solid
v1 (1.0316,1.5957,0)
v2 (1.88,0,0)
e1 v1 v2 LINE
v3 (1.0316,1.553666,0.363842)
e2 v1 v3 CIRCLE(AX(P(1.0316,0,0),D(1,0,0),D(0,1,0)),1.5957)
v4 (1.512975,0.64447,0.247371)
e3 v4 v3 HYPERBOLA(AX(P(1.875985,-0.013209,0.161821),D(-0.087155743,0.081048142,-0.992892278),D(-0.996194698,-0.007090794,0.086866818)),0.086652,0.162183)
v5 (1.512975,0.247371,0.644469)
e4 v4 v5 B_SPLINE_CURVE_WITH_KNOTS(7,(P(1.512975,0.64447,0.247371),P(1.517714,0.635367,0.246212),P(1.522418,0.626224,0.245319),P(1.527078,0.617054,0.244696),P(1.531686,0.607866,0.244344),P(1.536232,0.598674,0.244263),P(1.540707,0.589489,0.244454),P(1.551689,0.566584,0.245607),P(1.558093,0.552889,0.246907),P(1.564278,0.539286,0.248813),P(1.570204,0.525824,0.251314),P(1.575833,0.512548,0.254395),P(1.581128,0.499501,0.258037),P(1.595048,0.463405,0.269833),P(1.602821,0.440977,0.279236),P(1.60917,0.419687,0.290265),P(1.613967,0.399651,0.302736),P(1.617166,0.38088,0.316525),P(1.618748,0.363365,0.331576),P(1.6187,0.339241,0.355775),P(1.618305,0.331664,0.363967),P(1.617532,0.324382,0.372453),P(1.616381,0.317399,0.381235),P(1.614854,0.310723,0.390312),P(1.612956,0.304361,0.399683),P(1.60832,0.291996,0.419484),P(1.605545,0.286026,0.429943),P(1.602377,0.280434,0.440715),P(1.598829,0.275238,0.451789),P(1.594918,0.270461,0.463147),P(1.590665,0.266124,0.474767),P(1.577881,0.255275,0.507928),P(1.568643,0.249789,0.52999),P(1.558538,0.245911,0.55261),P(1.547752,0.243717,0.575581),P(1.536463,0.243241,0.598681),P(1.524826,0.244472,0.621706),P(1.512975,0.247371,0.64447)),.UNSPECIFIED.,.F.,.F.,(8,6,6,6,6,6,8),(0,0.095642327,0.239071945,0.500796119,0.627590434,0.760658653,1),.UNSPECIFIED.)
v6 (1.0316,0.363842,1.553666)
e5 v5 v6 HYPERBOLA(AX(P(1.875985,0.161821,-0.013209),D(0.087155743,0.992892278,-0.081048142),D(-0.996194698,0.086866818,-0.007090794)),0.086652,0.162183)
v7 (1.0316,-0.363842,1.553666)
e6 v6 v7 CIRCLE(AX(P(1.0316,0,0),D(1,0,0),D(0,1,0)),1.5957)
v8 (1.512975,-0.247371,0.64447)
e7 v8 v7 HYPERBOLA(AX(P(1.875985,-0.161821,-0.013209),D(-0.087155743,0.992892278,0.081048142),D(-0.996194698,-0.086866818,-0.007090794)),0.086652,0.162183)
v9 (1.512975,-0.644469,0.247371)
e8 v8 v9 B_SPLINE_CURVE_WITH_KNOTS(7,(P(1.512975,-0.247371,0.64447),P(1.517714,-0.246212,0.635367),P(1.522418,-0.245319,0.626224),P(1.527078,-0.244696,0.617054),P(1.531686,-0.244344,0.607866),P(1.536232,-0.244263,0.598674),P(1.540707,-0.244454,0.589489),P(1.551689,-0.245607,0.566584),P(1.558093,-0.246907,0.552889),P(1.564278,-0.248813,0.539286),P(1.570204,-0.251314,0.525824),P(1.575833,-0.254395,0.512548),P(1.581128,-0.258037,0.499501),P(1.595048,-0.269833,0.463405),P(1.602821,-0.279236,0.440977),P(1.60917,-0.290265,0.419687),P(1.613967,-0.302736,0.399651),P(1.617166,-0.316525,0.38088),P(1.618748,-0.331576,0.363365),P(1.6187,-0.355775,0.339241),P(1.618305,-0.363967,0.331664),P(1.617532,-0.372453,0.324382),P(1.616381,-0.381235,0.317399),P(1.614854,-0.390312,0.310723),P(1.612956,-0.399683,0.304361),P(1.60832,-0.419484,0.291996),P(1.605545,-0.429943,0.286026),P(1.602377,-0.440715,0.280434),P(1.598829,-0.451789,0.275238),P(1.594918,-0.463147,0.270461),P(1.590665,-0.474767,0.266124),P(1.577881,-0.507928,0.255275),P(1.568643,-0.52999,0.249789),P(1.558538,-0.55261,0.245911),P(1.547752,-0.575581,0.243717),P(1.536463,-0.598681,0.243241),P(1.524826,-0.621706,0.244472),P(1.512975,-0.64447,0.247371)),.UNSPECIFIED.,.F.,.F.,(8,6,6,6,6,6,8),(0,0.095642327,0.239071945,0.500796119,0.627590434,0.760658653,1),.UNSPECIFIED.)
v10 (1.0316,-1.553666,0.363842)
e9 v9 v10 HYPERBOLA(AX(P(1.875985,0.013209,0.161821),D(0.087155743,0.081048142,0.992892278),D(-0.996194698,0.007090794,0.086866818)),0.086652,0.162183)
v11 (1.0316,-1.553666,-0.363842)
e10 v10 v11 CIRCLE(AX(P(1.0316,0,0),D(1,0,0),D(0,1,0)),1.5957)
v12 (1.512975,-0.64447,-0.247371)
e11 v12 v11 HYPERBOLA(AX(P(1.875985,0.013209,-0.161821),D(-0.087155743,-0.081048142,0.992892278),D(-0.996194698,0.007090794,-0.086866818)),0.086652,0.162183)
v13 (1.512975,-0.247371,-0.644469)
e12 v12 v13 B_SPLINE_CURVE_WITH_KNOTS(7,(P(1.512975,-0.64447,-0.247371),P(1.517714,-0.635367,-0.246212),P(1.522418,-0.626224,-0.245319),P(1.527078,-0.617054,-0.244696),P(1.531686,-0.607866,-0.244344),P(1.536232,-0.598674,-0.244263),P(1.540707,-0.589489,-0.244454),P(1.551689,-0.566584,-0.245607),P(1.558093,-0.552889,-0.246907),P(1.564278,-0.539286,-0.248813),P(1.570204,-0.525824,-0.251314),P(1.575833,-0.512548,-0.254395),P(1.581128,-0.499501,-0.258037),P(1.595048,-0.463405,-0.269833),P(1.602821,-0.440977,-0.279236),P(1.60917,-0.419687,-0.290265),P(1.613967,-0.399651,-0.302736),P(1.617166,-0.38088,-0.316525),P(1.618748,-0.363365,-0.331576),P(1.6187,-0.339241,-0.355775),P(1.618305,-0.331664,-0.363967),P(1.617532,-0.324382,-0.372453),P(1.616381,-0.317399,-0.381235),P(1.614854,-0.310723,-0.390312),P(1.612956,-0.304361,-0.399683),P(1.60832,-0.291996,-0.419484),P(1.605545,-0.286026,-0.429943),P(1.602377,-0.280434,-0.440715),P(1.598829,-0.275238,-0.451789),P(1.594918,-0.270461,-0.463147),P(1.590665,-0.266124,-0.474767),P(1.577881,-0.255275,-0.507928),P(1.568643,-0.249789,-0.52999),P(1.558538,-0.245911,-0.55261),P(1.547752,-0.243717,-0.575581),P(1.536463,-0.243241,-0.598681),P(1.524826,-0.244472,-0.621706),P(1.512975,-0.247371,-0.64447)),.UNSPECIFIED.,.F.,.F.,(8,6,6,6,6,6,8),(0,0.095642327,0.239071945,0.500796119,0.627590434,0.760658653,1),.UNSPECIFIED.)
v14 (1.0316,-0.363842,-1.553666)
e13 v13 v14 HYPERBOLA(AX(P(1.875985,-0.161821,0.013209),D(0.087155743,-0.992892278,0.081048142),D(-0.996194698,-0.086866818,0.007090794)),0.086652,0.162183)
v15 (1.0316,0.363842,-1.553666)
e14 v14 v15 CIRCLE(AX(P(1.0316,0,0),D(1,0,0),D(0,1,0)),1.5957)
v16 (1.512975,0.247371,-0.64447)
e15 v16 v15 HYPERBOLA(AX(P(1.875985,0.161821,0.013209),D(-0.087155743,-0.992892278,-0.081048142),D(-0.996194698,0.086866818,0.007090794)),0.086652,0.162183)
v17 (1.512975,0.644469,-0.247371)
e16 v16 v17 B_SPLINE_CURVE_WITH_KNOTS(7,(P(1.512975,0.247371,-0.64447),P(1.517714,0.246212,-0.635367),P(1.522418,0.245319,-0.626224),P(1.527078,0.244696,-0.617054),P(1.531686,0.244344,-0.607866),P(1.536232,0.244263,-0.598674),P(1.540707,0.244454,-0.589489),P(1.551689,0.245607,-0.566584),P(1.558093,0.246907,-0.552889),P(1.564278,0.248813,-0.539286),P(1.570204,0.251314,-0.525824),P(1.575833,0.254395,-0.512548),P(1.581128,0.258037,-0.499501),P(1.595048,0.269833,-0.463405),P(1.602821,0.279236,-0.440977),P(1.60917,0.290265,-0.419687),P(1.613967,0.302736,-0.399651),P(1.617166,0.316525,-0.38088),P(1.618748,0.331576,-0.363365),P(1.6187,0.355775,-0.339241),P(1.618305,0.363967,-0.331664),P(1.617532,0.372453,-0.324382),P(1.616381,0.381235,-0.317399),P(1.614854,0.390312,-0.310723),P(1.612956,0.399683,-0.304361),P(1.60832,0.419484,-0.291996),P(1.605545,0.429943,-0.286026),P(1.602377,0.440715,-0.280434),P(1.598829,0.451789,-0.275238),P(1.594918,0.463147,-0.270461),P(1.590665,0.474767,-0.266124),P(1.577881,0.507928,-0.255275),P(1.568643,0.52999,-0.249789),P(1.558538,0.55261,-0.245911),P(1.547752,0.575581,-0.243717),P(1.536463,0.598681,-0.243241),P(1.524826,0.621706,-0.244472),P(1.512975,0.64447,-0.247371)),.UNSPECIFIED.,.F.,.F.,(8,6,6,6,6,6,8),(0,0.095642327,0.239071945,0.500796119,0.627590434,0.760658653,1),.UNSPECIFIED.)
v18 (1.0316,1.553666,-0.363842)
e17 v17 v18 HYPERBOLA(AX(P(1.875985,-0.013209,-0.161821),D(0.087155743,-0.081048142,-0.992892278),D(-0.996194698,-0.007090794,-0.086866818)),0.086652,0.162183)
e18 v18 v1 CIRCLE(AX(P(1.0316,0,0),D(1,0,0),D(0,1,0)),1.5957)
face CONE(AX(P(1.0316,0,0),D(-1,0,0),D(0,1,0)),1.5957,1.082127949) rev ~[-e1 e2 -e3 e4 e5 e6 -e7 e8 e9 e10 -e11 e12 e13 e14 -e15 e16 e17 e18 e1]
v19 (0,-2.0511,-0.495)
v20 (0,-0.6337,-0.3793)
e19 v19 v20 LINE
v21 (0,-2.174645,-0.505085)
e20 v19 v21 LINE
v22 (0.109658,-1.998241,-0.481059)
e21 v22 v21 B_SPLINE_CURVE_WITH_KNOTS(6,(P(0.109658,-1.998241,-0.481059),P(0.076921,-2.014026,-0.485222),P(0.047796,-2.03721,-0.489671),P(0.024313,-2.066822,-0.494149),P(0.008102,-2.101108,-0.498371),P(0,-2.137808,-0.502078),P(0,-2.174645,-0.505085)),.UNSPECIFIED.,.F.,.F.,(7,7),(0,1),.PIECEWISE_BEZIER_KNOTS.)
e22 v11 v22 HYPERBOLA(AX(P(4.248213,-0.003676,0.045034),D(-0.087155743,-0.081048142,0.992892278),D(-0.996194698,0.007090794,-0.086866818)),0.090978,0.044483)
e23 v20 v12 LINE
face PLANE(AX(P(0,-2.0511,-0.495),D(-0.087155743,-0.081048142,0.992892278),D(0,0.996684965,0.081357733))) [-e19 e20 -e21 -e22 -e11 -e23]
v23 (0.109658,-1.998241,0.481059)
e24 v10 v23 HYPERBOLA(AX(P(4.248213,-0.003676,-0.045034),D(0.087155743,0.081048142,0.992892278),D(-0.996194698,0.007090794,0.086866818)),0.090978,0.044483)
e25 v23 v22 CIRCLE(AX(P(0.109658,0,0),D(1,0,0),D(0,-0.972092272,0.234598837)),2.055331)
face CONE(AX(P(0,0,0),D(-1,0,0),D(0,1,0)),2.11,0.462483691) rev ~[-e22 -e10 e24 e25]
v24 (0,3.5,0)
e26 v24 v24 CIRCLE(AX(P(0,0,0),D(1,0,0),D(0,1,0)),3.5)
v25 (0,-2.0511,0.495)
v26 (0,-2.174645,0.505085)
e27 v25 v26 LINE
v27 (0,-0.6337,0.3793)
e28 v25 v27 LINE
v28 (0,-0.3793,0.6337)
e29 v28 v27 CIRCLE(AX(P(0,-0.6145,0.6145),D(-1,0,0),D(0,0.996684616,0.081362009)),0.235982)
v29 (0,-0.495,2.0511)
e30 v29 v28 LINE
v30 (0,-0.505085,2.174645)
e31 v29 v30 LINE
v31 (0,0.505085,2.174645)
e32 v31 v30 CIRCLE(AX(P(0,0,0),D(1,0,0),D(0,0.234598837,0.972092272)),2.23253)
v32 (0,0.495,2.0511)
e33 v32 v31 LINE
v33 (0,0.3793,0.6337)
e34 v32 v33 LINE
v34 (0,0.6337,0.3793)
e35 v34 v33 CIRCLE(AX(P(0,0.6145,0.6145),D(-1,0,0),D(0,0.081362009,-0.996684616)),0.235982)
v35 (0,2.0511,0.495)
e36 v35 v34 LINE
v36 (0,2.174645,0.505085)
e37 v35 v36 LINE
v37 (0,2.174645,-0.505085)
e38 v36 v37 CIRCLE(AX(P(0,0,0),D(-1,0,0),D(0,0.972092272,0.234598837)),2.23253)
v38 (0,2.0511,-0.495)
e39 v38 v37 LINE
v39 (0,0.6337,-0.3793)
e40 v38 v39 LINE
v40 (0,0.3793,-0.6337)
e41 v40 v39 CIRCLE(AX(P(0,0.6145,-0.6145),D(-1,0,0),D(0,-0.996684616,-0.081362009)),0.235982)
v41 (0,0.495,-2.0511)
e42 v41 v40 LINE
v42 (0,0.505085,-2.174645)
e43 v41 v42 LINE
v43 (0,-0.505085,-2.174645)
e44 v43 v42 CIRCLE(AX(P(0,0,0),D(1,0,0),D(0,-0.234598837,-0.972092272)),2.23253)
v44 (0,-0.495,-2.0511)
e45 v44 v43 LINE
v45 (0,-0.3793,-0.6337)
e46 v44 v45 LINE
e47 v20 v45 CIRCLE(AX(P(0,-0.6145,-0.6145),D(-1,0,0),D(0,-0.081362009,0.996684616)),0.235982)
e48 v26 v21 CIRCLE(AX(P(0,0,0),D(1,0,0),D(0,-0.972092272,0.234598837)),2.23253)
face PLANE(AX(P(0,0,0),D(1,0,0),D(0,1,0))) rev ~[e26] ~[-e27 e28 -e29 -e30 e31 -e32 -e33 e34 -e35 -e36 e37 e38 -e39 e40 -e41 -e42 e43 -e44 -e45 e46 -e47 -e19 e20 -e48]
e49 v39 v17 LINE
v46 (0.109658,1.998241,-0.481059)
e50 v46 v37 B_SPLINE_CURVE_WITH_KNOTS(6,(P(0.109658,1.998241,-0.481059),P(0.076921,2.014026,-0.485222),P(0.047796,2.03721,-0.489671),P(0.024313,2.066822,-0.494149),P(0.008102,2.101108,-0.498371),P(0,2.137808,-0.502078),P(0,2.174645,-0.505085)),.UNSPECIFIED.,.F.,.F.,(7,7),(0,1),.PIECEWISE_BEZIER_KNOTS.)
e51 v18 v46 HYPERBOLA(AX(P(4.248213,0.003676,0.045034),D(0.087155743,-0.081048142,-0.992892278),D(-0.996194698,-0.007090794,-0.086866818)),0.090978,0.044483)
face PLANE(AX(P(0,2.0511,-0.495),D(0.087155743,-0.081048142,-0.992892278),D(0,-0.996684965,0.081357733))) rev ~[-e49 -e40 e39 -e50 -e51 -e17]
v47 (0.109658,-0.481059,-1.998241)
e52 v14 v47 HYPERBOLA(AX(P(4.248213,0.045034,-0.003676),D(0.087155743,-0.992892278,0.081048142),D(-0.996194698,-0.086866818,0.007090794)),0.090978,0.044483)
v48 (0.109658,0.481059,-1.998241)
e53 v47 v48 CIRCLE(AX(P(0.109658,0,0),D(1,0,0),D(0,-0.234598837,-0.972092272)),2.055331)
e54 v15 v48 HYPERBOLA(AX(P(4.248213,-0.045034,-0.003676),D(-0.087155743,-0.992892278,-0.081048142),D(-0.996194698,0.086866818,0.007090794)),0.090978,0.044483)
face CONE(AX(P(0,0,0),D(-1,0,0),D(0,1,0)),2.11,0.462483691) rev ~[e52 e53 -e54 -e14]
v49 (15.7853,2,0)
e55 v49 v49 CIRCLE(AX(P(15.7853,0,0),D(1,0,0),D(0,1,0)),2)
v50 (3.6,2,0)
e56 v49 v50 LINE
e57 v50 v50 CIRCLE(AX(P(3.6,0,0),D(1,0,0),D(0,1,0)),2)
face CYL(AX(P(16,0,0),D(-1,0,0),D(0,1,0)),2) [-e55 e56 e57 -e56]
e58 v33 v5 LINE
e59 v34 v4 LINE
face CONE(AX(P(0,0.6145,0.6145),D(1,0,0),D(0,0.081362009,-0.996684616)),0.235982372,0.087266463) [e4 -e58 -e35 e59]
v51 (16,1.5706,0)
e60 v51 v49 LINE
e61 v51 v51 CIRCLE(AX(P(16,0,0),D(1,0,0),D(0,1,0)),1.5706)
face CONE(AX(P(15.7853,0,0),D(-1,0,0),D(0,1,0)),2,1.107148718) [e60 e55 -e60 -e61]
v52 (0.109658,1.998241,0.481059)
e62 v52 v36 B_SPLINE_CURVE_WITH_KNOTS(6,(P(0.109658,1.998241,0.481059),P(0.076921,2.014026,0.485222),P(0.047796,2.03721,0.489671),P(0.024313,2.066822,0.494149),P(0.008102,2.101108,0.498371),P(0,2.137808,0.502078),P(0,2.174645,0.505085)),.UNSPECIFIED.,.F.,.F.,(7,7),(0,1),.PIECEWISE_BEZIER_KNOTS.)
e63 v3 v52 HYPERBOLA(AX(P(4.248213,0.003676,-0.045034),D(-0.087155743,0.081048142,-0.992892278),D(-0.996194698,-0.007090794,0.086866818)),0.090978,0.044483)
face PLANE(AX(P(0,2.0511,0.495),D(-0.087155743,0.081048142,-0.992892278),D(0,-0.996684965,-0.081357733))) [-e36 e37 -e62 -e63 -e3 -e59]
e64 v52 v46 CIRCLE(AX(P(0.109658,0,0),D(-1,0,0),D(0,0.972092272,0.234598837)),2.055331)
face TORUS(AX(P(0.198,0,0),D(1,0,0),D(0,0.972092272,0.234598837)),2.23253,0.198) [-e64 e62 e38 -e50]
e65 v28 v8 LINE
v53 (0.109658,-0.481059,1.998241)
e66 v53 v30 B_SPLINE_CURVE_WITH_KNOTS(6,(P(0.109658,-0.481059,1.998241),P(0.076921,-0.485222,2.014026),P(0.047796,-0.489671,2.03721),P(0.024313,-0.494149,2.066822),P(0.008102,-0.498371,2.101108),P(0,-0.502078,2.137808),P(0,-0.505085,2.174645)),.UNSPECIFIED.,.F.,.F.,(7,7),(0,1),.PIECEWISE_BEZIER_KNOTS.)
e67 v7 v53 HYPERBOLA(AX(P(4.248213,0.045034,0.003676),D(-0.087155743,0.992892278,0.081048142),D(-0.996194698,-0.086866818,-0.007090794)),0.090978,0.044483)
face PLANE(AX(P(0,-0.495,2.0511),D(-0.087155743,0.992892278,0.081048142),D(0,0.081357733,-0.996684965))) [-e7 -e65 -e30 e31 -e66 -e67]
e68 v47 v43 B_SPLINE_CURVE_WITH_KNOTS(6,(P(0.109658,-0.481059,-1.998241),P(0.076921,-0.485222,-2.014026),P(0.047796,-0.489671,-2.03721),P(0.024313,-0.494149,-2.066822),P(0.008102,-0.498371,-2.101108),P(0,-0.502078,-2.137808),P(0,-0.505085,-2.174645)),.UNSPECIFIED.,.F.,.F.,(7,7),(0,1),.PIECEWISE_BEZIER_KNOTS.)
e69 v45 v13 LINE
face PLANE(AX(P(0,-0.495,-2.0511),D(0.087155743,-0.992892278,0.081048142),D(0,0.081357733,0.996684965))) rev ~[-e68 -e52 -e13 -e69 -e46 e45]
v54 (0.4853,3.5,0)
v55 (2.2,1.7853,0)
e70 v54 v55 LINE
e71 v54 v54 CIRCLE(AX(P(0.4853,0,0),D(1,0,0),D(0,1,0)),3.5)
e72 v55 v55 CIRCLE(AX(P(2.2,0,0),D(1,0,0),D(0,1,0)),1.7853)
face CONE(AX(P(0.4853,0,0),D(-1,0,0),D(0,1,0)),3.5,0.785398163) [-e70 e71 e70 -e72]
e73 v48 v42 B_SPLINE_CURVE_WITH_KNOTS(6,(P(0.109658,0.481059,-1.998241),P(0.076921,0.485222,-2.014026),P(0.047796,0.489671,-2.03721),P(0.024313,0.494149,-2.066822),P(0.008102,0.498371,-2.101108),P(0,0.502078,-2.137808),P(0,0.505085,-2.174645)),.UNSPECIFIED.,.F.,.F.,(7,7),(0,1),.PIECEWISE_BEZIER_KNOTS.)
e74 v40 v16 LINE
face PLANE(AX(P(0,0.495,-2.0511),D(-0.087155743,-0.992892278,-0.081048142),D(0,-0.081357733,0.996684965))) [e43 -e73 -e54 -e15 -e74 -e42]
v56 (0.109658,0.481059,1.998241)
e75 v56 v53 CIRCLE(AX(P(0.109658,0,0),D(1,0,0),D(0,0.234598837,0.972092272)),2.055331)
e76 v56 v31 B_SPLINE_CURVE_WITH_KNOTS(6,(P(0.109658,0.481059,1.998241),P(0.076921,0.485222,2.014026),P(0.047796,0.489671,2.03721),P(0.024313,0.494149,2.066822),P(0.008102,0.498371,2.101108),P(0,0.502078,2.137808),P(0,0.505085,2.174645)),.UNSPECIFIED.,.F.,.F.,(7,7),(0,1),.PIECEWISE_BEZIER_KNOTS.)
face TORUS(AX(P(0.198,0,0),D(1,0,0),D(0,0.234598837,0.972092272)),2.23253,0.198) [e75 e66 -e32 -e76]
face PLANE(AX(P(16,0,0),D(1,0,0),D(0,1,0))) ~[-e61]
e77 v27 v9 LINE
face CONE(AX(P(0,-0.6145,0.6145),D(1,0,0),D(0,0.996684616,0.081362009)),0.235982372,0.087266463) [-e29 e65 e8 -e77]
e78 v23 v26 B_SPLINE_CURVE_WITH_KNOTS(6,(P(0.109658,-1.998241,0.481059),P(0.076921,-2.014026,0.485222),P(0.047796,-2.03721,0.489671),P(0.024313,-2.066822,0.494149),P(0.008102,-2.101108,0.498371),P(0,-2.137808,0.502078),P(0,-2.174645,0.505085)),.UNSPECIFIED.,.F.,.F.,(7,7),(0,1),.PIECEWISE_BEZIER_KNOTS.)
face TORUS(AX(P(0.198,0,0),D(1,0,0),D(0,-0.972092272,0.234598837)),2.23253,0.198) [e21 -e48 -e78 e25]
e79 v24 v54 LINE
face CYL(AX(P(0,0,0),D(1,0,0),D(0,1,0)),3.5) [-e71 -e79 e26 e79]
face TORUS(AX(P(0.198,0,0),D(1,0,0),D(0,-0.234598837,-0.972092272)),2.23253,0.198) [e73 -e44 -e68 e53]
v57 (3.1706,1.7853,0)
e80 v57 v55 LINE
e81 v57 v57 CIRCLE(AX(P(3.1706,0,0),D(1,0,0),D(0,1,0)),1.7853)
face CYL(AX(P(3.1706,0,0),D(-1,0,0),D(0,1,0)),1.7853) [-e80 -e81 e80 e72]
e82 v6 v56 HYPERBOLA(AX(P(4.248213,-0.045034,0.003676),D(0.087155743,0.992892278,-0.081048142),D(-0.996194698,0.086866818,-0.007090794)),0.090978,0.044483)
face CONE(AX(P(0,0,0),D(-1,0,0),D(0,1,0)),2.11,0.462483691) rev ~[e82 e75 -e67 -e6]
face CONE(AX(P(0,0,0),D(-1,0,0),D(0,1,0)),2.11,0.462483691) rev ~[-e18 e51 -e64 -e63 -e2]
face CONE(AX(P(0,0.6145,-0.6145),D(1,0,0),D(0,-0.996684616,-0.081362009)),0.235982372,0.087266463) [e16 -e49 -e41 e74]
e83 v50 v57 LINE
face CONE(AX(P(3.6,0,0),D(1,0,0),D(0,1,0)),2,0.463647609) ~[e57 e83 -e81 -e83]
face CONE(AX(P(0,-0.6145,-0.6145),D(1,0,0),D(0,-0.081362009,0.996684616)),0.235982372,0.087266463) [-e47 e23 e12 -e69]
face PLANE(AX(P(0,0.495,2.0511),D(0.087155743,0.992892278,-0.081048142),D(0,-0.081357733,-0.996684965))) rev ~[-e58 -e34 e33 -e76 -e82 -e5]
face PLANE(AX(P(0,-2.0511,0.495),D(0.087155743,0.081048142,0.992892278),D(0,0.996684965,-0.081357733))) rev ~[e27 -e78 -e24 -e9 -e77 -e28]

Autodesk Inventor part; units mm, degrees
ref_plane "YZ Plane" through (0, 0, 0) normal (1, 0, 0) x (0, 1, 0)
ref_plane "XZ Plane" through (0, 0, 0) normal (0, 1, 0) x (-1, 0, 0)
sketch "Sketch1" plane through (0, 0, 0) normal (0, 0, 1) x (1, 0, 0)
  line L0 (1.88, 0) -> (16, 0)
  line L1 (16, 0) -> (16, 2)
  line L2 (16, 2) -> (3.6, 2)
  line L3 (3.6, 2) -> (3.1706, 1.7853)
  line L4 (3.1706, 1.7853) -> (2.2, 1.7853)
  line L5 (0, 3.5) -> (0, 2.11)
  line L6 (0, 2.11) -> (1.0316, 1.5957)
  line L7 (1.0316, 1.5957) -> (1.88, 0)
  line L8 (-3.2, 0) -> (19.2, 0) projected
  line L9 (0, -0.7) -> (0, 4.2) projected
  line L10 (0, 3.5) -> (0.4853, 3.5)
  line L11 (0.4853, 3.5) -> (2.2, 1.7853)
  line L12 (3.6, 2) -> (1.9853, 2) construction
  dimension "d1" = 12.4
  dimension "d2" = 4
  dimension "d3" = 3.5706
  dimension "d4" = 4.22
  dimension "d5" = 26.5
  dimension "d6" = 62
  dimension "d7" = 1.88
  dimension "d8" = 0.4294
  dimension "d12" = 7
  dimension "d13" = 45
  dimension "d15" = 16
  dimension "d24" = 2.2
revolve "Body" add sketch "Sketch1" angle 360 about axis through (1.88, 0, 0) along (1, 0, 0) contours L7 L6 L5 L10 L11 L4 L3 L2 L1 L0
sketch "Sketch2" plane through (0, 0, 0) normal (-1, 0, 0) x (0, 0, 1)
  line L0 (0, 2.11) -> (0, 0) construction
  line L1 (0, 0) -> (2.11, 0) construction
  arc A0 (0.633, 0) -> (0, 0.633) centre (0, 0) ccw construction
  arc A1 (0.7385, 0) -> (0, 0.7385) centre (0, 0) ccw construction
  arc A2 (2.0511, 0.495) -> (0.495, 2.0511) centre (0, 0) ccw
  line L2 (0, 0) -> (1.492, 1.492) construction
  line L3 (0.495, 2.0511) -> (0.3793, 0.6337)
  line L4 (2.0511, 0.495) -> (0.6337, 0.3793)
  arc A3 (0.495, 2.0511) -> (0, 2.11) centre (0, 0) ccw
  arc A4 (2.11, 0) -> (2.0511, 0.495) centre (0, 0) ccw
  line L5 (0, -4.9) -> (0, 4.9) projected
  line L6 (-4.9, 0) -> (4.9, 0) projected
  arc A5 (0.495, -2.0511) -> (2.0511, -0.495) centre (0, 0) ccw
  line L7 (0.495, -2.0511) -> (0.3793, -0.6337)
  line L8 (2.0511, -0.495) -> (0.6337, -0.3793)
  arc A6 (0, -2.11) -> (0.495, -2.0511) centre (0, 0) ccw
  arc A7 (2.0511, -0.495) -> (2.11, 0) centre (0, 0) ccw
  arc A8 (-0.495, 2.0511) -> (-2.0511, 0.495) centre (0, 0) ccw
  line L9 (-0.495, 2.0511) -> (-0.3793, 0.6337)
  line L10 (-2.0511, 0.495) -> (-0.6337, 0.3793)
  arc A9 (0, 2.11) -> (-0.495, 2.0511) centre (0, 0) ccw
  arc A10 (-2.0511, 0.495) -> (-2.11, 0) centre (0, 0) ccw
  arc A11 (-0.495, -2.0511) -> (0, -2.11) centre (0, 0) ccw
  arc A12 (-2.0511, -0.495) -> (-0.495, -2.0511) centre (0, 0) ccw
  arc A13 (-2.11, 0) -> (-2.0511, -0.495) centre (0, 0) ccw
  line L11 (-2.0511, -0.495) -> (-0.6337, -0.3793)
  line L12 (-0.495, -2.0511) -> (-0.3793, -0.6337)
  arc A14 (0.3793, 0.6337) -> (0.6337, 0.3793) centre (0.6145, 0.6145) ccw
  arc A15 (0.6337, -0.3793) -> (0.3793, -0.6337) centre (0.6145, -0.6145) ccw
  arc A16 (-0.6337, 0.3793) -> (-0.3793, 0.6337) centre (-0.6145, 0.6145) ccw
  arc A17 (-0.3793, -0.6337) -> (-0.6337, -0.3793) centre (-0.6145, -0.6145) ccw
  point P0 (1.492, -1.492)
  point P1 (-1.492, 1.492)
  point P2 (-1.492, -1.492)
  dimension "d17" = 1.266
  dimension "d18" = 1.477
  dimension "d19" = 4.22
  dimension "d20" = 45
  dimension "d21" = 0.495
extrude "Slot" add sketch "Sketch2" against normal up to next draft 5 contours L4 A14 L3 A2 | A5 L7 A15 L8 | L9 A16 L10 A8 | A12 L11 A17 L12
fillet "Fillet1" radius 0.198 4 edges at (0, 2.11, 0) (0, 0, -2.11) (0, -2.11, 0) (0, 0, 2.11)
thread "Thread" size "M4x0.7" class "6g" standard "ISO Metric profile" length 12.4
chamfer "Chamfer1" distance 0.4294 distance2 0.2147 1 edges at (16, -2, 0) measured on face at (16, 1.0659, -0.3793)
ref_plane "Work Plane2" through (3.35, 0, 0) normal (0, 0, -1) x (1, 0, 0)
equation "\"d17\" = 0.3 * SDM"
equation "\"d18\" = 0.35 * SDM"
equation "\"d19\" = SDM"
equation "\"d21\" = 0.5 * SBR"
equation "\"d1\" = GEL"
equation "\"d2\" = GD"
equation "\"d3\" = BDM"
equation "\"d4\" = SDM"
equation "\"d7\" = INTI"
equation "\"d8\" = GAL"
equation "\"d12\" = KOD"
equation "\"d13\" = 0.5 * SEWI"
equation "\"d15\" = NLG"
equation "\"d24\" = KOH"
equation "\"d23\" = 0.2 * SBR"
equation "\"d10\" = GEL"
equation "\"d25\" = -0.5 * SPD + 0.5 * GD"
equation "\"d26\" = 0.5 * GAL"
equation "\"NLG\" = 16"
equation "\"GEL\" = 12.4"
equation "\"GAL\" = 0.61345 * PTC"
equation "\"SPD\" = NND - 1.2269 * PTC"
equation "\"KOD\" = 7"
equation "\"KOH\" = 2.2"
equation "\"SBR\" = 0.99"
equation "\"INTI\" = 1.88"
equation "\"SDM\" = 4.22"
equation "\"GD\" = NND"
equation "\"BDM\" = NND - GAL"
equation "\"SEWI\" = 90deg"
equation "\"d9\" = SDM"
equation "\"GUL\" = 0.61345 * PTC"
equation "\"TOA\" = 30deg"
equation "\"EPV\" = 4.2"
equation "\"THREADDIA\" = 4"
equation "\"RR\" = 0.4"
equation "\"PTC\" = 0.7"
equation "\"NND\" = 4"
equation "\"GD1\" = THREADDIA - 1.2269 * PTC"
properties part number "AS 1427 - M4 x 16" material "Steel, Mild"
